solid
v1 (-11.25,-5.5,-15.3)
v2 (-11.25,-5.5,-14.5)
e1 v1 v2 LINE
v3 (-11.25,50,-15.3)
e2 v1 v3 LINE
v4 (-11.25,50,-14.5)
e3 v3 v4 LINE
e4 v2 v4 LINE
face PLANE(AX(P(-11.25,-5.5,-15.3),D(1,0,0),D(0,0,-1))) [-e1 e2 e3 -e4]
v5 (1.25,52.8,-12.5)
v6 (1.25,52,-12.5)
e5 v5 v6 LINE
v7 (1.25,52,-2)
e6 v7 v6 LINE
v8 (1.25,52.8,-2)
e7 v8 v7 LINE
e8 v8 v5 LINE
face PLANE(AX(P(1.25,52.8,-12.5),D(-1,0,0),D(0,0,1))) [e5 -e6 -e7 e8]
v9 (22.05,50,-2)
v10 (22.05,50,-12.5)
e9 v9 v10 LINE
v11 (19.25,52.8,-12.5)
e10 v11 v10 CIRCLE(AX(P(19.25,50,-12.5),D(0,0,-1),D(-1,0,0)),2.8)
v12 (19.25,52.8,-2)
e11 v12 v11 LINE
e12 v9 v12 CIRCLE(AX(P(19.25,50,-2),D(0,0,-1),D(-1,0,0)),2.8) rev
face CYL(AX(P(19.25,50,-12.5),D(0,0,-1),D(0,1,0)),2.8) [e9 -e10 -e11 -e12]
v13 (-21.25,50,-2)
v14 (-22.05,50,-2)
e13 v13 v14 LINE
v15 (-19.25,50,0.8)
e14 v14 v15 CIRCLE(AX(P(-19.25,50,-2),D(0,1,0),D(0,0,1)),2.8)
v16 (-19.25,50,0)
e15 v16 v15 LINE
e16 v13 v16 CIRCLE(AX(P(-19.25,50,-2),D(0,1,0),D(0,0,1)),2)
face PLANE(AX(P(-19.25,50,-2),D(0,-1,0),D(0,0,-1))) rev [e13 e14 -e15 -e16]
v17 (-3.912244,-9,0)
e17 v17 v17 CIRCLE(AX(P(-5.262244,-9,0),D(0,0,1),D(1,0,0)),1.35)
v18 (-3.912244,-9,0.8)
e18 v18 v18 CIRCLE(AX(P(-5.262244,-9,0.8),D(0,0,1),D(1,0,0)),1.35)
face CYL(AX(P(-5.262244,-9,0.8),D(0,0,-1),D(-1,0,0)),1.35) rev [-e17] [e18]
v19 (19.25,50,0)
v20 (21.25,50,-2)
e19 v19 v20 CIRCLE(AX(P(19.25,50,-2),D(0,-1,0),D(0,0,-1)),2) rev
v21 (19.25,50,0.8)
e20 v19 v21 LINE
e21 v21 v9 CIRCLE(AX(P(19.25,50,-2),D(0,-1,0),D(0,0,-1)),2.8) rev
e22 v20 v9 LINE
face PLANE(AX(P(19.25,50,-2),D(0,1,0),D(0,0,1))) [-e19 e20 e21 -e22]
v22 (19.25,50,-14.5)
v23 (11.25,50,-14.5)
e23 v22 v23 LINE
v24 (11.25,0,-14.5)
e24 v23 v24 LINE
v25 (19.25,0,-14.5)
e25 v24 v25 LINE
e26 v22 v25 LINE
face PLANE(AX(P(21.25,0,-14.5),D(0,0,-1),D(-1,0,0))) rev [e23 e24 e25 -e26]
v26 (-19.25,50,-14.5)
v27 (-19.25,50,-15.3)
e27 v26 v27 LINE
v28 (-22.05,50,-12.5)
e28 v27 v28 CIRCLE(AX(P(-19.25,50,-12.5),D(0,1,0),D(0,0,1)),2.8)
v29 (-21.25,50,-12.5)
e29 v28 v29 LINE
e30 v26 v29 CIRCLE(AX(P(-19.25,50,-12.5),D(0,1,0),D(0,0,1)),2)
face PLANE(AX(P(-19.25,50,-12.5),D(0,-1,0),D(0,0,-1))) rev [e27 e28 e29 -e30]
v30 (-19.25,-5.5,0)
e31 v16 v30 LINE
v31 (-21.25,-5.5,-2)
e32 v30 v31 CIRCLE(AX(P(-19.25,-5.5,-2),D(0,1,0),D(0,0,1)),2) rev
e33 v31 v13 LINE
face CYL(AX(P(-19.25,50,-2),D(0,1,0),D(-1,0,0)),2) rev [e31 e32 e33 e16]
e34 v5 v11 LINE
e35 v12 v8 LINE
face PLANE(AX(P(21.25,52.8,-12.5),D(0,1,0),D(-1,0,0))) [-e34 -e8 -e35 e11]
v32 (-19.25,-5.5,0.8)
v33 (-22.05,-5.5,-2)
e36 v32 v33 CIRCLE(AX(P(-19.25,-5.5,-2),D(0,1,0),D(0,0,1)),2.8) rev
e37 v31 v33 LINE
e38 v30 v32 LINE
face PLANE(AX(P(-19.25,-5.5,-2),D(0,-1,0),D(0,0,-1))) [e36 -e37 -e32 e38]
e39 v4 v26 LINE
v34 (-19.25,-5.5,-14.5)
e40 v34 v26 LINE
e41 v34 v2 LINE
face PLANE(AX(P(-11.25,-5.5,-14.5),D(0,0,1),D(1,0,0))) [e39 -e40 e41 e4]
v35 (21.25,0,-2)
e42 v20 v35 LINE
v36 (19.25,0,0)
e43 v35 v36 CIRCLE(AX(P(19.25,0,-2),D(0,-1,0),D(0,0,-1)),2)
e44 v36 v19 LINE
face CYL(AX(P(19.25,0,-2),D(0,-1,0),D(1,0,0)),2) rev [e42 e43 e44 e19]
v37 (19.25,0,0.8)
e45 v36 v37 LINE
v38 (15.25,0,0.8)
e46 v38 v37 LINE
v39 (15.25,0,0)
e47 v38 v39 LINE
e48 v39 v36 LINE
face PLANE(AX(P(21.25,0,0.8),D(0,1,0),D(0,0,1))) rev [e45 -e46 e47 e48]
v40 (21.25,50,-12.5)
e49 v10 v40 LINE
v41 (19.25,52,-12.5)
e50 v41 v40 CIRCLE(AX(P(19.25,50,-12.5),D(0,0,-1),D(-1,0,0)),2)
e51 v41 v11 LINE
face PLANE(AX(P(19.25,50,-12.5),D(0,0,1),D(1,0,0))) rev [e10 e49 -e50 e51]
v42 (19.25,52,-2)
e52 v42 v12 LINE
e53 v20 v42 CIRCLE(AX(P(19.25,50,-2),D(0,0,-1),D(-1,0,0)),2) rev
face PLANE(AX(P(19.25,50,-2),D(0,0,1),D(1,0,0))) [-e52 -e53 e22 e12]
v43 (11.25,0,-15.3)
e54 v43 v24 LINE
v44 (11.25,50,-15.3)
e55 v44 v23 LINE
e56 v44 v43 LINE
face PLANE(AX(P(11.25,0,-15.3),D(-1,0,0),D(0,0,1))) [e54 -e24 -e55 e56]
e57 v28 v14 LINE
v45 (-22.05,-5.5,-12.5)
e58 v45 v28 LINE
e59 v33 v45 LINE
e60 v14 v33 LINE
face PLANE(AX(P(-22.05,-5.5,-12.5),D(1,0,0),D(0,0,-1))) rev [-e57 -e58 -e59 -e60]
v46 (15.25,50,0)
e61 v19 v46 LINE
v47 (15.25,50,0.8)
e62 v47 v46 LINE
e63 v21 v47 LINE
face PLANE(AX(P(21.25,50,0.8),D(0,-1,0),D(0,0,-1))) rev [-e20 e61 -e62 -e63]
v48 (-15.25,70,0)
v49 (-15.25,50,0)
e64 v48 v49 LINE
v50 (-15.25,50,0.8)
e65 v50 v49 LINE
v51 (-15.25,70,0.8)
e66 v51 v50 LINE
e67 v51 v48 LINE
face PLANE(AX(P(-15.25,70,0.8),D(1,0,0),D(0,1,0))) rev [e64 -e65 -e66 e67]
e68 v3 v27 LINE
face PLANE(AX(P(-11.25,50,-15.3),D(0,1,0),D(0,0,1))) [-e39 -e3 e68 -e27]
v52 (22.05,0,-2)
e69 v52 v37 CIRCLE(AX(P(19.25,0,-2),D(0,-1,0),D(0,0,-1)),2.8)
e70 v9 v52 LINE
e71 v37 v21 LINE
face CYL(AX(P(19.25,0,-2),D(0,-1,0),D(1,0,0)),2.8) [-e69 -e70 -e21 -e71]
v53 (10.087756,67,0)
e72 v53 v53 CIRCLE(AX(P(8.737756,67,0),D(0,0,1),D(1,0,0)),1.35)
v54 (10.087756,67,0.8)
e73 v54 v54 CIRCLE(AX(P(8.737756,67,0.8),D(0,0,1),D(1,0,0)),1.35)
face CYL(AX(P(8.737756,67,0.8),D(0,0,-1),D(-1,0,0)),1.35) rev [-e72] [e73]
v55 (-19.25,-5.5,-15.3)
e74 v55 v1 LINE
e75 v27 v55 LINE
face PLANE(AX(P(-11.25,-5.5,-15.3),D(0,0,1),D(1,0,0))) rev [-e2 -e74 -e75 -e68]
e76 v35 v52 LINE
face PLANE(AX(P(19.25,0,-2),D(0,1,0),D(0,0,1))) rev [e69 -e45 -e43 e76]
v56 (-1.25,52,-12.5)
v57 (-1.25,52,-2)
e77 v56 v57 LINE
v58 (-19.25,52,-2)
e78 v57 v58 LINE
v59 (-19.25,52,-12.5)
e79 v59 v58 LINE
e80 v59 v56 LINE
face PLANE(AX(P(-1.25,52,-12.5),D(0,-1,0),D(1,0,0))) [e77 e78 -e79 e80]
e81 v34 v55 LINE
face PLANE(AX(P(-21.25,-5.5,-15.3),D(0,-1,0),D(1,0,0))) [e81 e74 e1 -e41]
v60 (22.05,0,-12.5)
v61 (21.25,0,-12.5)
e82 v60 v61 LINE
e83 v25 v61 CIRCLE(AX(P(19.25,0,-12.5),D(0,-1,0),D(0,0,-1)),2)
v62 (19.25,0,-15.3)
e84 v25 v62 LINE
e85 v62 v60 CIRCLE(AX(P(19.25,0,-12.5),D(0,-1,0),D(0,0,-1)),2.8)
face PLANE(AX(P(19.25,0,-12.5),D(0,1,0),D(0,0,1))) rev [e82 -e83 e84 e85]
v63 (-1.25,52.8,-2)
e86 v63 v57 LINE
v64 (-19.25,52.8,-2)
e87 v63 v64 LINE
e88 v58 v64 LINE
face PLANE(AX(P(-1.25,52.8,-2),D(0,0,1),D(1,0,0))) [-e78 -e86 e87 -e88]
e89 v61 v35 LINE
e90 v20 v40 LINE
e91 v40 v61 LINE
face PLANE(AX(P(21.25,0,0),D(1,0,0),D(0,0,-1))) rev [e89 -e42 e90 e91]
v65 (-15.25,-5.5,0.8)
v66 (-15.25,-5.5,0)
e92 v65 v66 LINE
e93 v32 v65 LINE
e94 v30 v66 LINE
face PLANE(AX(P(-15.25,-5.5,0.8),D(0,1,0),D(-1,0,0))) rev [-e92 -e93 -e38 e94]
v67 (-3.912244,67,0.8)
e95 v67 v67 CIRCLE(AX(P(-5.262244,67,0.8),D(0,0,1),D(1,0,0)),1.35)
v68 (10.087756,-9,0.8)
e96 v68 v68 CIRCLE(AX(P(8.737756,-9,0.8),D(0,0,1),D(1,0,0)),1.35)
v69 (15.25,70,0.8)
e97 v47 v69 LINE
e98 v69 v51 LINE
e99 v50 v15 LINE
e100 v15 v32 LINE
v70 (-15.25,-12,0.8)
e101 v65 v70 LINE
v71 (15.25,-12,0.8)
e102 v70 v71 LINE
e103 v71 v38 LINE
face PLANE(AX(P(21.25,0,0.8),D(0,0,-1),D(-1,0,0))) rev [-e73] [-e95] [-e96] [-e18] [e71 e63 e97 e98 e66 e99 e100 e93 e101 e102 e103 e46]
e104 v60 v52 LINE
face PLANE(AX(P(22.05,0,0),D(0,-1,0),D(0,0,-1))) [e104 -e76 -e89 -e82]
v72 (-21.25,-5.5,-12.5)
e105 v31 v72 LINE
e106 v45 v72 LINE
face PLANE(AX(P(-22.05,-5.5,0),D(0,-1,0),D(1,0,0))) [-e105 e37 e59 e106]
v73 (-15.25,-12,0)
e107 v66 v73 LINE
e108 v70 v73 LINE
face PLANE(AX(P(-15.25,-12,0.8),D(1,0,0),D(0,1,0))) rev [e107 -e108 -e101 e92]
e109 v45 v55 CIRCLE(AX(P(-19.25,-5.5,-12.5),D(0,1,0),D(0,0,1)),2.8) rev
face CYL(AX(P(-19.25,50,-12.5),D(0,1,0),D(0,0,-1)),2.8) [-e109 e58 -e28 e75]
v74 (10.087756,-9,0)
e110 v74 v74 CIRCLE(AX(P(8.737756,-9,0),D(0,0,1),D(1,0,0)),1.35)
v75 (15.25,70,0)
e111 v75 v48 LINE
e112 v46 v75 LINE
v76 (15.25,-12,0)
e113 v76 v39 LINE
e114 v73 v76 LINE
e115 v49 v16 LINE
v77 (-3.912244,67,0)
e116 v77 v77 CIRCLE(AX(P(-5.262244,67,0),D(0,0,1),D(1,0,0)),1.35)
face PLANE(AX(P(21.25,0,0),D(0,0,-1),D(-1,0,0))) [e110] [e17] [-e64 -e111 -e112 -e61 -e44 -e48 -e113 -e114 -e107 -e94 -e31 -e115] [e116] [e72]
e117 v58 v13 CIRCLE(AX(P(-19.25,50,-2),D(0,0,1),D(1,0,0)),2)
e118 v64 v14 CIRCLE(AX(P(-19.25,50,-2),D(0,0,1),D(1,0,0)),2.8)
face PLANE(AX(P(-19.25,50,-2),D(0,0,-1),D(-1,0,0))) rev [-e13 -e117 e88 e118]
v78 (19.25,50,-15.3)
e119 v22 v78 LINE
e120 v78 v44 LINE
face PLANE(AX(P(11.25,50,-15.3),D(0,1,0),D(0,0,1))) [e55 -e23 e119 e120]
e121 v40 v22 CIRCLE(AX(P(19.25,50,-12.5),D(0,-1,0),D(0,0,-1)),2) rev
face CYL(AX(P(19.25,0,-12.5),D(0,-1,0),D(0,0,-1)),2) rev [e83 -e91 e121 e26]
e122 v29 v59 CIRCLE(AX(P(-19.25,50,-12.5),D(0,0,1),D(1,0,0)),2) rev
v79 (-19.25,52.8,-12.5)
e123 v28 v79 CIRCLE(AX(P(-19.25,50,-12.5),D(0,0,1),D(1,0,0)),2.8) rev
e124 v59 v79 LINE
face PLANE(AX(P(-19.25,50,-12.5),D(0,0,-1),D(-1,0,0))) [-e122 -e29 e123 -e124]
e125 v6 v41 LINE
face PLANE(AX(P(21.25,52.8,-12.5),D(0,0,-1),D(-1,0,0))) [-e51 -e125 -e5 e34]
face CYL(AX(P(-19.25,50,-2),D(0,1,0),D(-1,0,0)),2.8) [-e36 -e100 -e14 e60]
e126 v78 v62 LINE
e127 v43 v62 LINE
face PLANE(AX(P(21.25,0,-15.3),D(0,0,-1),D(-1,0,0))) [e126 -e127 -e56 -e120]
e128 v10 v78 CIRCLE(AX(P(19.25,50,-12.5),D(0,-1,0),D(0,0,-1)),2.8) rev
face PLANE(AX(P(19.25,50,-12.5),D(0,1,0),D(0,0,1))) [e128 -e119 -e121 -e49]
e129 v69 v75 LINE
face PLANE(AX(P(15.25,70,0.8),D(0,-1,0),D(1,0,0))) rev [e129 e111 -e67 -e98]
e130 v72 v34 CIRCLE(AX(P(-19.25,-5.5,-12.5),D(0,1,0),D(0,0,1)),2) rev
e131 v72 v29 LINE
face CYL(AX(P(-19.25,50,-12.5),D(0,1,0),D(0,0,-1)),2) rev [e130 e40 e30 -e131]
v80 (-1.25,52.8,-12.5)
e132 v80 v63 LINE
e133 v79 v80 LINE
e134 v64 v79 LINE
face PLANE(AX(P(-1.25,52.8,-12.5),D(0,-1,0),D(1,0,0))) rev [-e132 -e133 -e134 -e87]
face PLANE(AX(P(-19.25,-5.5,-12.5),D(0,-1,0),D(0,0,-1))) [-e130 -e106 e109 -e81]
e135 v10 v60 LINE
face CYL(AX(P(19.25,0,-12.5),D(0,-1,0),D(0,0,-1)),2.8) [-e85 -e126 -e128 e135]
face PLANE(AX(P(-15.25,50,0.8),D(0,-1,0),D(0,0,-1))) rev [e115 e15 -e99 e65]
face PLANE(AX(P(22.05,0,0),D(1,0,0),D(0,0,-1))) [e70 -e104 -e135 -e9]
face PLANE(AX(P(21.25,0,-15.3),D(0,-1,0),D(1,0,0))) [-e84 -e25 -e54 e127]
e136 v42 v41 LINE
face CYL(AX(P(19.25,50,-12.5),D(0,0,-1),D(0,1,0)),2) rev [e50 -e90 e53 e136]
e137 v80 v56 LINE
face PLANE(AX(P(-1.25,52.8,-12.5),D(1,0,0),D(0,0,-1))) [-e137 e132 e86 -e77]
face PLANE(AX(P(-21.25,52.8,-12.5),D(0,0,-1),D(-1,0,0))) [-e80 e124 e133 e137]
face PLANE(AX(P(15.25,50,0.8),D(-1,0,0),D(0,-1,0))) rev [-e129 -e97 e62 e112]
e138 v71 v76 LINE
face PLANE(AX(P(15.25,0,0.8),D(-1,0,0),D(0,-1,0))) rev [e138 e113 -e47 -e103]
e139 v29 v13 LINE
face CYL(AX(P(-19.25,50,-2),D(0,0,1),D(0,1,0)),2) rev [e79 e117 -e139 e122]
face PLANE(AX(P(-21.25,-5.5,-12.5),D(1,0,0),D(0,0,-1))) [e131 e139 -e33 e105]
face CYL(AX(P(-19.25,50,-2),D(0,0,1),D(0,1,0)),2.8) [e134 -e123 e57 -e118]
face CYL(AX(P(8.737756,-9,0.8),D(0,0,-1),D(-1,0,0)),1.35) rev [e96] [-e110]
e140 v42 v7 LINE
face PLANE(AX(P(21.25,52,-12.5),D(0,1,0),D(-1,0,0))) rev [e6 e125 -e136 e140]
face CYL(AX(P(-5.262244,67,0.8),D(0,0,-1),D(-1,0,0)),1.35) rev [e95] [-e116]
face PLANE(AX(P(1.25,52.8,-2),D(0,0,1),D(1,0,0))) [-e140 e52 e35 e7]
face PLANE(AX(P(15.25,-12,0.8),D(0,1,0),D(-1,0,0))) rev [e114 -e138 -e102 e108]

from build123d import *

# Parameters (mm, degrees)
SKETCH1_R                      = 1.35
BASE_FLANGE1_DEPTH             = 0.8
EDGE_FLANGE1_STRIP_W           = 7.2
EDGE_FLANGE1_STRIP_H           = 0.8
EDGE_FLANGE1_STRIP_CUT_DEPTH   = 50
EDGE_FLANGE1_STRIP_2_W         = 7.2
EDGE_FLANGE1_STRIP_2_H         = 0.8
EDGE_FLANGE1_STRIP_CUT_2_DEPTH = 55.5
EDGE_FLANGE1_DEPTH             = 50
EDGE_FLANGE1_BEND_DEPTH        = 55.5
EDGE_FLANGE4_DEPTH             = 10.5
EDGE_FLANGE4_BEND_DEPTH        = 10.5
EDGE_FLANGE5_DEPTH             = 50
EDGE_FLANGE5_BEND_DEPTH        = 55.5


# Sheet-metal steps are written as plain solids
with BuildPart() as part:
    # Sketch1 → Base-Flange1 (new body)
    with BuildSketch(Plane.XY):
        Polygon((15.25, 0), (15.25, -12), (-15.25, -12), (-15.25, -5.5), (-21.25, -5.5), (-21.25, 50), (-15.25, 50), (-15.25, 70), (15.25, 70), (15.25, 50), (21.25, 50), (21.25, 0), align=None)
        with Locations((8.737756115, -9)):
            Circle(SKETCH1_R, mode=Mode.SUBTRACT)
        with Locations((-5.262243885, -9)):
            Circle(SKETCH1_R, mode=Mode.SUBTRACT)
        with Locations((8.737756115, 67)):
            Circle(SKETCH1_R, mode=Mode.SUBTRACT)
        with Locations((-5.262243885, 67)):
            Circle(SKETCH1_R, mode=Mode.SUBTRACT)
    extrude(amount=BASE_FLANGE1_DEPTH)

    # Edge-Flange1 strip (across the edge) → Edge-Flange1 strip cut (cut)
    with BuildSketch(Plane(origin=(21.25, 50, 0), x_dir=(-1, 0, 0), z_dir=(0, -1, 0))):
        with Locations((-1.6, -0.4)):
            Rectangle(EDGE_FLANGE1_STRIP_W, EDGE_FLANGE1_STRIP_H)
    extrude(amount=EDGE_FLANGE1_STRIP_CUT_DEPTH, mode=Mode.SUBTRACT)

    # Edge-Flange1 strip 2 (across the edge) → Edge-Flange1 strip cut 2 (cut)
    with BuildSketch(Plane(origin=(-21.25, -5.5, 0), x_dir=(1, 0, 0), z_dir=(0, 1, 0))):
        with Locations((-1.6, -0.4)):
            Rectangle(EDGE_FLANGE1_STRIP_2_W, EDGE_FLANGE1_STRIP_2_H)
    extrude(amount=EDGE_FLANGE1_STRIP_CUT_2_DEPTH, mode=Mode.SUBTRACT)

    # Edge-Flange1 section (across the edge) → Edge-Flange1 (add)
    with BuildSketch(Plane(origin=(21.25, 50, 0), x_dir=(-1, 0, 0), z_dir=(0, -1, 0))):
        with BuildLine():
            Line((-0.8, 2), (-0.8, 12.5))
            Line((-0.8, 12.5), (0, 12.5))
            Line((0, 12.5), (0, 2))
            ThreePointArc((0, 2), (0.585786438, 0.585786438), (2, 0))
            Line((2, 0), (2, -0.8))
            ThreePointArc((2, -0.8), (0.020101013, 0.020101013), (-0.8, 2))
        make_face()
    extrude(amount=EDGE_FLANGE1_DEPTH)

    # Edge-Flange1 section 2 (across the edge) → Edge-Flange1 bend (add)
    with BuildSketch(Plane(origin=(-21.25, -5.5, 0), x_dir=(1, 0, 0), z_dir=(0, 1, 0))):
        with BuildLine():
            Line((-0.8, 2), (-0.8, 12.5))
            Line((-0.8, 12.5), (0, 12.5))
            Line((0, 12.5), (0, 2))
            ThreePointArc((0, 2), (0.585786438, 0.585786438), (2, 0))
            Line((2, 0), (2, -0.8))
            ThreePointArc((2, -0.8), (0.020101013, 0.020101013), (-0.8, 2))
        make_face()
    extrude(amount=EDGE_FLANGE1_BEND_DEPTH)

    # Edge-Flange4 section (across the edge) → Edge-Flange4 (add)
    with BuildSketch(Plane(origin=(21.25, 52, -2), x_dir=(0, -1, 0), z_dir=(0, 0, -1))):
        with BuildLine():
            Line((-0.8, 2), (-0.8, 20))
            Line((-0.8, 20), (0, 20))
            Line((0, 20), (0, 2))
            ThreePointArc((0, 2), (0.585786438, 0.585786438), (2, 0))
            Line((2, 0), (2, -0.8))
            ThreePointArc((2, -0.8), (0.020101013, 0.020101013), (-0.8, 2))
        make_face()
    extrude(amount=EDGE_FLANGE4_DEPTH)

    # Edge-Flange4 section 2 (across the edge) → Edge-Flange4 bend (add)
    with BuildSketch(Plane(origin=(-21.25, 52, -12.5), x_dir=(0, -1, 0), z_dir=(0, 0, 1))):
        with BuildLine():
            Line((-0.8, 2), (-0.8, 20))
            Line((-0.8, 20), (0, 20))
            Line((0, 20), (0, 2))
            ThreePointArc((0, 2), (0.585786438, 0.585786438), (2, 0))
            Line((2, 0), (2, -0.8))
            ThreePointArc((2, -0.8), (0.020101013, 0.020101013), (-0.8, 2))
        make_face()
    extrude(amount=EDGE_FLANGE4_BEND_DEPTH)

    # Edge-Flange5 section (across the edge) → Edge-Flange5 (add)
    with BuildSketch(Plane(origin=(21.25, 50, -14.5), x_dir=(0, 0, 1), z_dir=(0, -1, 0))):
        with BuildLine():
            Line((-0.8, 2), (-0.8, 10))
            Line((-0.8, 10), (0, 10))
            Line((0, 10), (0, 2))
            ThreePointArc((0, 2), (0.585786438, 0.585786438), (2, 0))
            Line((2, 0), (2, -0.8))
            ThreePointArc((2, -0.8), (0.020101013, 0.020101013), (-0.8, 2))
        make_face()
    extrude(amount=EDGE_FLANGE5_DEPTH)

    # Edge-Flange5 section 2 (across the edge) → Edge-Flange5 bend (add)
    with BuildSketch(Plane(origin=(-21.25, -5.5, -14.5), x_dir=(0, 0, 1), z_dir=(0, 1, 0))):
        with BuildLine():
            Line((-0.8, 2), (-0.8, 10))
            Line((-0.8, 10), (0, 10))
            Line((0, 10), (0, 2))
            ThreePointArc((0, 2), (0.585786438, 0.585786438), (2, 0))
            Line((2, 0), (2, -0.8))
            ThreePointArc((2, -0.8), (0.020101013, 0.020101013), (-0.8, 2))
        make_face()
    extrude(amount=EDGE_FLANGE5_BEND_DEPTH)


solid = part.part
